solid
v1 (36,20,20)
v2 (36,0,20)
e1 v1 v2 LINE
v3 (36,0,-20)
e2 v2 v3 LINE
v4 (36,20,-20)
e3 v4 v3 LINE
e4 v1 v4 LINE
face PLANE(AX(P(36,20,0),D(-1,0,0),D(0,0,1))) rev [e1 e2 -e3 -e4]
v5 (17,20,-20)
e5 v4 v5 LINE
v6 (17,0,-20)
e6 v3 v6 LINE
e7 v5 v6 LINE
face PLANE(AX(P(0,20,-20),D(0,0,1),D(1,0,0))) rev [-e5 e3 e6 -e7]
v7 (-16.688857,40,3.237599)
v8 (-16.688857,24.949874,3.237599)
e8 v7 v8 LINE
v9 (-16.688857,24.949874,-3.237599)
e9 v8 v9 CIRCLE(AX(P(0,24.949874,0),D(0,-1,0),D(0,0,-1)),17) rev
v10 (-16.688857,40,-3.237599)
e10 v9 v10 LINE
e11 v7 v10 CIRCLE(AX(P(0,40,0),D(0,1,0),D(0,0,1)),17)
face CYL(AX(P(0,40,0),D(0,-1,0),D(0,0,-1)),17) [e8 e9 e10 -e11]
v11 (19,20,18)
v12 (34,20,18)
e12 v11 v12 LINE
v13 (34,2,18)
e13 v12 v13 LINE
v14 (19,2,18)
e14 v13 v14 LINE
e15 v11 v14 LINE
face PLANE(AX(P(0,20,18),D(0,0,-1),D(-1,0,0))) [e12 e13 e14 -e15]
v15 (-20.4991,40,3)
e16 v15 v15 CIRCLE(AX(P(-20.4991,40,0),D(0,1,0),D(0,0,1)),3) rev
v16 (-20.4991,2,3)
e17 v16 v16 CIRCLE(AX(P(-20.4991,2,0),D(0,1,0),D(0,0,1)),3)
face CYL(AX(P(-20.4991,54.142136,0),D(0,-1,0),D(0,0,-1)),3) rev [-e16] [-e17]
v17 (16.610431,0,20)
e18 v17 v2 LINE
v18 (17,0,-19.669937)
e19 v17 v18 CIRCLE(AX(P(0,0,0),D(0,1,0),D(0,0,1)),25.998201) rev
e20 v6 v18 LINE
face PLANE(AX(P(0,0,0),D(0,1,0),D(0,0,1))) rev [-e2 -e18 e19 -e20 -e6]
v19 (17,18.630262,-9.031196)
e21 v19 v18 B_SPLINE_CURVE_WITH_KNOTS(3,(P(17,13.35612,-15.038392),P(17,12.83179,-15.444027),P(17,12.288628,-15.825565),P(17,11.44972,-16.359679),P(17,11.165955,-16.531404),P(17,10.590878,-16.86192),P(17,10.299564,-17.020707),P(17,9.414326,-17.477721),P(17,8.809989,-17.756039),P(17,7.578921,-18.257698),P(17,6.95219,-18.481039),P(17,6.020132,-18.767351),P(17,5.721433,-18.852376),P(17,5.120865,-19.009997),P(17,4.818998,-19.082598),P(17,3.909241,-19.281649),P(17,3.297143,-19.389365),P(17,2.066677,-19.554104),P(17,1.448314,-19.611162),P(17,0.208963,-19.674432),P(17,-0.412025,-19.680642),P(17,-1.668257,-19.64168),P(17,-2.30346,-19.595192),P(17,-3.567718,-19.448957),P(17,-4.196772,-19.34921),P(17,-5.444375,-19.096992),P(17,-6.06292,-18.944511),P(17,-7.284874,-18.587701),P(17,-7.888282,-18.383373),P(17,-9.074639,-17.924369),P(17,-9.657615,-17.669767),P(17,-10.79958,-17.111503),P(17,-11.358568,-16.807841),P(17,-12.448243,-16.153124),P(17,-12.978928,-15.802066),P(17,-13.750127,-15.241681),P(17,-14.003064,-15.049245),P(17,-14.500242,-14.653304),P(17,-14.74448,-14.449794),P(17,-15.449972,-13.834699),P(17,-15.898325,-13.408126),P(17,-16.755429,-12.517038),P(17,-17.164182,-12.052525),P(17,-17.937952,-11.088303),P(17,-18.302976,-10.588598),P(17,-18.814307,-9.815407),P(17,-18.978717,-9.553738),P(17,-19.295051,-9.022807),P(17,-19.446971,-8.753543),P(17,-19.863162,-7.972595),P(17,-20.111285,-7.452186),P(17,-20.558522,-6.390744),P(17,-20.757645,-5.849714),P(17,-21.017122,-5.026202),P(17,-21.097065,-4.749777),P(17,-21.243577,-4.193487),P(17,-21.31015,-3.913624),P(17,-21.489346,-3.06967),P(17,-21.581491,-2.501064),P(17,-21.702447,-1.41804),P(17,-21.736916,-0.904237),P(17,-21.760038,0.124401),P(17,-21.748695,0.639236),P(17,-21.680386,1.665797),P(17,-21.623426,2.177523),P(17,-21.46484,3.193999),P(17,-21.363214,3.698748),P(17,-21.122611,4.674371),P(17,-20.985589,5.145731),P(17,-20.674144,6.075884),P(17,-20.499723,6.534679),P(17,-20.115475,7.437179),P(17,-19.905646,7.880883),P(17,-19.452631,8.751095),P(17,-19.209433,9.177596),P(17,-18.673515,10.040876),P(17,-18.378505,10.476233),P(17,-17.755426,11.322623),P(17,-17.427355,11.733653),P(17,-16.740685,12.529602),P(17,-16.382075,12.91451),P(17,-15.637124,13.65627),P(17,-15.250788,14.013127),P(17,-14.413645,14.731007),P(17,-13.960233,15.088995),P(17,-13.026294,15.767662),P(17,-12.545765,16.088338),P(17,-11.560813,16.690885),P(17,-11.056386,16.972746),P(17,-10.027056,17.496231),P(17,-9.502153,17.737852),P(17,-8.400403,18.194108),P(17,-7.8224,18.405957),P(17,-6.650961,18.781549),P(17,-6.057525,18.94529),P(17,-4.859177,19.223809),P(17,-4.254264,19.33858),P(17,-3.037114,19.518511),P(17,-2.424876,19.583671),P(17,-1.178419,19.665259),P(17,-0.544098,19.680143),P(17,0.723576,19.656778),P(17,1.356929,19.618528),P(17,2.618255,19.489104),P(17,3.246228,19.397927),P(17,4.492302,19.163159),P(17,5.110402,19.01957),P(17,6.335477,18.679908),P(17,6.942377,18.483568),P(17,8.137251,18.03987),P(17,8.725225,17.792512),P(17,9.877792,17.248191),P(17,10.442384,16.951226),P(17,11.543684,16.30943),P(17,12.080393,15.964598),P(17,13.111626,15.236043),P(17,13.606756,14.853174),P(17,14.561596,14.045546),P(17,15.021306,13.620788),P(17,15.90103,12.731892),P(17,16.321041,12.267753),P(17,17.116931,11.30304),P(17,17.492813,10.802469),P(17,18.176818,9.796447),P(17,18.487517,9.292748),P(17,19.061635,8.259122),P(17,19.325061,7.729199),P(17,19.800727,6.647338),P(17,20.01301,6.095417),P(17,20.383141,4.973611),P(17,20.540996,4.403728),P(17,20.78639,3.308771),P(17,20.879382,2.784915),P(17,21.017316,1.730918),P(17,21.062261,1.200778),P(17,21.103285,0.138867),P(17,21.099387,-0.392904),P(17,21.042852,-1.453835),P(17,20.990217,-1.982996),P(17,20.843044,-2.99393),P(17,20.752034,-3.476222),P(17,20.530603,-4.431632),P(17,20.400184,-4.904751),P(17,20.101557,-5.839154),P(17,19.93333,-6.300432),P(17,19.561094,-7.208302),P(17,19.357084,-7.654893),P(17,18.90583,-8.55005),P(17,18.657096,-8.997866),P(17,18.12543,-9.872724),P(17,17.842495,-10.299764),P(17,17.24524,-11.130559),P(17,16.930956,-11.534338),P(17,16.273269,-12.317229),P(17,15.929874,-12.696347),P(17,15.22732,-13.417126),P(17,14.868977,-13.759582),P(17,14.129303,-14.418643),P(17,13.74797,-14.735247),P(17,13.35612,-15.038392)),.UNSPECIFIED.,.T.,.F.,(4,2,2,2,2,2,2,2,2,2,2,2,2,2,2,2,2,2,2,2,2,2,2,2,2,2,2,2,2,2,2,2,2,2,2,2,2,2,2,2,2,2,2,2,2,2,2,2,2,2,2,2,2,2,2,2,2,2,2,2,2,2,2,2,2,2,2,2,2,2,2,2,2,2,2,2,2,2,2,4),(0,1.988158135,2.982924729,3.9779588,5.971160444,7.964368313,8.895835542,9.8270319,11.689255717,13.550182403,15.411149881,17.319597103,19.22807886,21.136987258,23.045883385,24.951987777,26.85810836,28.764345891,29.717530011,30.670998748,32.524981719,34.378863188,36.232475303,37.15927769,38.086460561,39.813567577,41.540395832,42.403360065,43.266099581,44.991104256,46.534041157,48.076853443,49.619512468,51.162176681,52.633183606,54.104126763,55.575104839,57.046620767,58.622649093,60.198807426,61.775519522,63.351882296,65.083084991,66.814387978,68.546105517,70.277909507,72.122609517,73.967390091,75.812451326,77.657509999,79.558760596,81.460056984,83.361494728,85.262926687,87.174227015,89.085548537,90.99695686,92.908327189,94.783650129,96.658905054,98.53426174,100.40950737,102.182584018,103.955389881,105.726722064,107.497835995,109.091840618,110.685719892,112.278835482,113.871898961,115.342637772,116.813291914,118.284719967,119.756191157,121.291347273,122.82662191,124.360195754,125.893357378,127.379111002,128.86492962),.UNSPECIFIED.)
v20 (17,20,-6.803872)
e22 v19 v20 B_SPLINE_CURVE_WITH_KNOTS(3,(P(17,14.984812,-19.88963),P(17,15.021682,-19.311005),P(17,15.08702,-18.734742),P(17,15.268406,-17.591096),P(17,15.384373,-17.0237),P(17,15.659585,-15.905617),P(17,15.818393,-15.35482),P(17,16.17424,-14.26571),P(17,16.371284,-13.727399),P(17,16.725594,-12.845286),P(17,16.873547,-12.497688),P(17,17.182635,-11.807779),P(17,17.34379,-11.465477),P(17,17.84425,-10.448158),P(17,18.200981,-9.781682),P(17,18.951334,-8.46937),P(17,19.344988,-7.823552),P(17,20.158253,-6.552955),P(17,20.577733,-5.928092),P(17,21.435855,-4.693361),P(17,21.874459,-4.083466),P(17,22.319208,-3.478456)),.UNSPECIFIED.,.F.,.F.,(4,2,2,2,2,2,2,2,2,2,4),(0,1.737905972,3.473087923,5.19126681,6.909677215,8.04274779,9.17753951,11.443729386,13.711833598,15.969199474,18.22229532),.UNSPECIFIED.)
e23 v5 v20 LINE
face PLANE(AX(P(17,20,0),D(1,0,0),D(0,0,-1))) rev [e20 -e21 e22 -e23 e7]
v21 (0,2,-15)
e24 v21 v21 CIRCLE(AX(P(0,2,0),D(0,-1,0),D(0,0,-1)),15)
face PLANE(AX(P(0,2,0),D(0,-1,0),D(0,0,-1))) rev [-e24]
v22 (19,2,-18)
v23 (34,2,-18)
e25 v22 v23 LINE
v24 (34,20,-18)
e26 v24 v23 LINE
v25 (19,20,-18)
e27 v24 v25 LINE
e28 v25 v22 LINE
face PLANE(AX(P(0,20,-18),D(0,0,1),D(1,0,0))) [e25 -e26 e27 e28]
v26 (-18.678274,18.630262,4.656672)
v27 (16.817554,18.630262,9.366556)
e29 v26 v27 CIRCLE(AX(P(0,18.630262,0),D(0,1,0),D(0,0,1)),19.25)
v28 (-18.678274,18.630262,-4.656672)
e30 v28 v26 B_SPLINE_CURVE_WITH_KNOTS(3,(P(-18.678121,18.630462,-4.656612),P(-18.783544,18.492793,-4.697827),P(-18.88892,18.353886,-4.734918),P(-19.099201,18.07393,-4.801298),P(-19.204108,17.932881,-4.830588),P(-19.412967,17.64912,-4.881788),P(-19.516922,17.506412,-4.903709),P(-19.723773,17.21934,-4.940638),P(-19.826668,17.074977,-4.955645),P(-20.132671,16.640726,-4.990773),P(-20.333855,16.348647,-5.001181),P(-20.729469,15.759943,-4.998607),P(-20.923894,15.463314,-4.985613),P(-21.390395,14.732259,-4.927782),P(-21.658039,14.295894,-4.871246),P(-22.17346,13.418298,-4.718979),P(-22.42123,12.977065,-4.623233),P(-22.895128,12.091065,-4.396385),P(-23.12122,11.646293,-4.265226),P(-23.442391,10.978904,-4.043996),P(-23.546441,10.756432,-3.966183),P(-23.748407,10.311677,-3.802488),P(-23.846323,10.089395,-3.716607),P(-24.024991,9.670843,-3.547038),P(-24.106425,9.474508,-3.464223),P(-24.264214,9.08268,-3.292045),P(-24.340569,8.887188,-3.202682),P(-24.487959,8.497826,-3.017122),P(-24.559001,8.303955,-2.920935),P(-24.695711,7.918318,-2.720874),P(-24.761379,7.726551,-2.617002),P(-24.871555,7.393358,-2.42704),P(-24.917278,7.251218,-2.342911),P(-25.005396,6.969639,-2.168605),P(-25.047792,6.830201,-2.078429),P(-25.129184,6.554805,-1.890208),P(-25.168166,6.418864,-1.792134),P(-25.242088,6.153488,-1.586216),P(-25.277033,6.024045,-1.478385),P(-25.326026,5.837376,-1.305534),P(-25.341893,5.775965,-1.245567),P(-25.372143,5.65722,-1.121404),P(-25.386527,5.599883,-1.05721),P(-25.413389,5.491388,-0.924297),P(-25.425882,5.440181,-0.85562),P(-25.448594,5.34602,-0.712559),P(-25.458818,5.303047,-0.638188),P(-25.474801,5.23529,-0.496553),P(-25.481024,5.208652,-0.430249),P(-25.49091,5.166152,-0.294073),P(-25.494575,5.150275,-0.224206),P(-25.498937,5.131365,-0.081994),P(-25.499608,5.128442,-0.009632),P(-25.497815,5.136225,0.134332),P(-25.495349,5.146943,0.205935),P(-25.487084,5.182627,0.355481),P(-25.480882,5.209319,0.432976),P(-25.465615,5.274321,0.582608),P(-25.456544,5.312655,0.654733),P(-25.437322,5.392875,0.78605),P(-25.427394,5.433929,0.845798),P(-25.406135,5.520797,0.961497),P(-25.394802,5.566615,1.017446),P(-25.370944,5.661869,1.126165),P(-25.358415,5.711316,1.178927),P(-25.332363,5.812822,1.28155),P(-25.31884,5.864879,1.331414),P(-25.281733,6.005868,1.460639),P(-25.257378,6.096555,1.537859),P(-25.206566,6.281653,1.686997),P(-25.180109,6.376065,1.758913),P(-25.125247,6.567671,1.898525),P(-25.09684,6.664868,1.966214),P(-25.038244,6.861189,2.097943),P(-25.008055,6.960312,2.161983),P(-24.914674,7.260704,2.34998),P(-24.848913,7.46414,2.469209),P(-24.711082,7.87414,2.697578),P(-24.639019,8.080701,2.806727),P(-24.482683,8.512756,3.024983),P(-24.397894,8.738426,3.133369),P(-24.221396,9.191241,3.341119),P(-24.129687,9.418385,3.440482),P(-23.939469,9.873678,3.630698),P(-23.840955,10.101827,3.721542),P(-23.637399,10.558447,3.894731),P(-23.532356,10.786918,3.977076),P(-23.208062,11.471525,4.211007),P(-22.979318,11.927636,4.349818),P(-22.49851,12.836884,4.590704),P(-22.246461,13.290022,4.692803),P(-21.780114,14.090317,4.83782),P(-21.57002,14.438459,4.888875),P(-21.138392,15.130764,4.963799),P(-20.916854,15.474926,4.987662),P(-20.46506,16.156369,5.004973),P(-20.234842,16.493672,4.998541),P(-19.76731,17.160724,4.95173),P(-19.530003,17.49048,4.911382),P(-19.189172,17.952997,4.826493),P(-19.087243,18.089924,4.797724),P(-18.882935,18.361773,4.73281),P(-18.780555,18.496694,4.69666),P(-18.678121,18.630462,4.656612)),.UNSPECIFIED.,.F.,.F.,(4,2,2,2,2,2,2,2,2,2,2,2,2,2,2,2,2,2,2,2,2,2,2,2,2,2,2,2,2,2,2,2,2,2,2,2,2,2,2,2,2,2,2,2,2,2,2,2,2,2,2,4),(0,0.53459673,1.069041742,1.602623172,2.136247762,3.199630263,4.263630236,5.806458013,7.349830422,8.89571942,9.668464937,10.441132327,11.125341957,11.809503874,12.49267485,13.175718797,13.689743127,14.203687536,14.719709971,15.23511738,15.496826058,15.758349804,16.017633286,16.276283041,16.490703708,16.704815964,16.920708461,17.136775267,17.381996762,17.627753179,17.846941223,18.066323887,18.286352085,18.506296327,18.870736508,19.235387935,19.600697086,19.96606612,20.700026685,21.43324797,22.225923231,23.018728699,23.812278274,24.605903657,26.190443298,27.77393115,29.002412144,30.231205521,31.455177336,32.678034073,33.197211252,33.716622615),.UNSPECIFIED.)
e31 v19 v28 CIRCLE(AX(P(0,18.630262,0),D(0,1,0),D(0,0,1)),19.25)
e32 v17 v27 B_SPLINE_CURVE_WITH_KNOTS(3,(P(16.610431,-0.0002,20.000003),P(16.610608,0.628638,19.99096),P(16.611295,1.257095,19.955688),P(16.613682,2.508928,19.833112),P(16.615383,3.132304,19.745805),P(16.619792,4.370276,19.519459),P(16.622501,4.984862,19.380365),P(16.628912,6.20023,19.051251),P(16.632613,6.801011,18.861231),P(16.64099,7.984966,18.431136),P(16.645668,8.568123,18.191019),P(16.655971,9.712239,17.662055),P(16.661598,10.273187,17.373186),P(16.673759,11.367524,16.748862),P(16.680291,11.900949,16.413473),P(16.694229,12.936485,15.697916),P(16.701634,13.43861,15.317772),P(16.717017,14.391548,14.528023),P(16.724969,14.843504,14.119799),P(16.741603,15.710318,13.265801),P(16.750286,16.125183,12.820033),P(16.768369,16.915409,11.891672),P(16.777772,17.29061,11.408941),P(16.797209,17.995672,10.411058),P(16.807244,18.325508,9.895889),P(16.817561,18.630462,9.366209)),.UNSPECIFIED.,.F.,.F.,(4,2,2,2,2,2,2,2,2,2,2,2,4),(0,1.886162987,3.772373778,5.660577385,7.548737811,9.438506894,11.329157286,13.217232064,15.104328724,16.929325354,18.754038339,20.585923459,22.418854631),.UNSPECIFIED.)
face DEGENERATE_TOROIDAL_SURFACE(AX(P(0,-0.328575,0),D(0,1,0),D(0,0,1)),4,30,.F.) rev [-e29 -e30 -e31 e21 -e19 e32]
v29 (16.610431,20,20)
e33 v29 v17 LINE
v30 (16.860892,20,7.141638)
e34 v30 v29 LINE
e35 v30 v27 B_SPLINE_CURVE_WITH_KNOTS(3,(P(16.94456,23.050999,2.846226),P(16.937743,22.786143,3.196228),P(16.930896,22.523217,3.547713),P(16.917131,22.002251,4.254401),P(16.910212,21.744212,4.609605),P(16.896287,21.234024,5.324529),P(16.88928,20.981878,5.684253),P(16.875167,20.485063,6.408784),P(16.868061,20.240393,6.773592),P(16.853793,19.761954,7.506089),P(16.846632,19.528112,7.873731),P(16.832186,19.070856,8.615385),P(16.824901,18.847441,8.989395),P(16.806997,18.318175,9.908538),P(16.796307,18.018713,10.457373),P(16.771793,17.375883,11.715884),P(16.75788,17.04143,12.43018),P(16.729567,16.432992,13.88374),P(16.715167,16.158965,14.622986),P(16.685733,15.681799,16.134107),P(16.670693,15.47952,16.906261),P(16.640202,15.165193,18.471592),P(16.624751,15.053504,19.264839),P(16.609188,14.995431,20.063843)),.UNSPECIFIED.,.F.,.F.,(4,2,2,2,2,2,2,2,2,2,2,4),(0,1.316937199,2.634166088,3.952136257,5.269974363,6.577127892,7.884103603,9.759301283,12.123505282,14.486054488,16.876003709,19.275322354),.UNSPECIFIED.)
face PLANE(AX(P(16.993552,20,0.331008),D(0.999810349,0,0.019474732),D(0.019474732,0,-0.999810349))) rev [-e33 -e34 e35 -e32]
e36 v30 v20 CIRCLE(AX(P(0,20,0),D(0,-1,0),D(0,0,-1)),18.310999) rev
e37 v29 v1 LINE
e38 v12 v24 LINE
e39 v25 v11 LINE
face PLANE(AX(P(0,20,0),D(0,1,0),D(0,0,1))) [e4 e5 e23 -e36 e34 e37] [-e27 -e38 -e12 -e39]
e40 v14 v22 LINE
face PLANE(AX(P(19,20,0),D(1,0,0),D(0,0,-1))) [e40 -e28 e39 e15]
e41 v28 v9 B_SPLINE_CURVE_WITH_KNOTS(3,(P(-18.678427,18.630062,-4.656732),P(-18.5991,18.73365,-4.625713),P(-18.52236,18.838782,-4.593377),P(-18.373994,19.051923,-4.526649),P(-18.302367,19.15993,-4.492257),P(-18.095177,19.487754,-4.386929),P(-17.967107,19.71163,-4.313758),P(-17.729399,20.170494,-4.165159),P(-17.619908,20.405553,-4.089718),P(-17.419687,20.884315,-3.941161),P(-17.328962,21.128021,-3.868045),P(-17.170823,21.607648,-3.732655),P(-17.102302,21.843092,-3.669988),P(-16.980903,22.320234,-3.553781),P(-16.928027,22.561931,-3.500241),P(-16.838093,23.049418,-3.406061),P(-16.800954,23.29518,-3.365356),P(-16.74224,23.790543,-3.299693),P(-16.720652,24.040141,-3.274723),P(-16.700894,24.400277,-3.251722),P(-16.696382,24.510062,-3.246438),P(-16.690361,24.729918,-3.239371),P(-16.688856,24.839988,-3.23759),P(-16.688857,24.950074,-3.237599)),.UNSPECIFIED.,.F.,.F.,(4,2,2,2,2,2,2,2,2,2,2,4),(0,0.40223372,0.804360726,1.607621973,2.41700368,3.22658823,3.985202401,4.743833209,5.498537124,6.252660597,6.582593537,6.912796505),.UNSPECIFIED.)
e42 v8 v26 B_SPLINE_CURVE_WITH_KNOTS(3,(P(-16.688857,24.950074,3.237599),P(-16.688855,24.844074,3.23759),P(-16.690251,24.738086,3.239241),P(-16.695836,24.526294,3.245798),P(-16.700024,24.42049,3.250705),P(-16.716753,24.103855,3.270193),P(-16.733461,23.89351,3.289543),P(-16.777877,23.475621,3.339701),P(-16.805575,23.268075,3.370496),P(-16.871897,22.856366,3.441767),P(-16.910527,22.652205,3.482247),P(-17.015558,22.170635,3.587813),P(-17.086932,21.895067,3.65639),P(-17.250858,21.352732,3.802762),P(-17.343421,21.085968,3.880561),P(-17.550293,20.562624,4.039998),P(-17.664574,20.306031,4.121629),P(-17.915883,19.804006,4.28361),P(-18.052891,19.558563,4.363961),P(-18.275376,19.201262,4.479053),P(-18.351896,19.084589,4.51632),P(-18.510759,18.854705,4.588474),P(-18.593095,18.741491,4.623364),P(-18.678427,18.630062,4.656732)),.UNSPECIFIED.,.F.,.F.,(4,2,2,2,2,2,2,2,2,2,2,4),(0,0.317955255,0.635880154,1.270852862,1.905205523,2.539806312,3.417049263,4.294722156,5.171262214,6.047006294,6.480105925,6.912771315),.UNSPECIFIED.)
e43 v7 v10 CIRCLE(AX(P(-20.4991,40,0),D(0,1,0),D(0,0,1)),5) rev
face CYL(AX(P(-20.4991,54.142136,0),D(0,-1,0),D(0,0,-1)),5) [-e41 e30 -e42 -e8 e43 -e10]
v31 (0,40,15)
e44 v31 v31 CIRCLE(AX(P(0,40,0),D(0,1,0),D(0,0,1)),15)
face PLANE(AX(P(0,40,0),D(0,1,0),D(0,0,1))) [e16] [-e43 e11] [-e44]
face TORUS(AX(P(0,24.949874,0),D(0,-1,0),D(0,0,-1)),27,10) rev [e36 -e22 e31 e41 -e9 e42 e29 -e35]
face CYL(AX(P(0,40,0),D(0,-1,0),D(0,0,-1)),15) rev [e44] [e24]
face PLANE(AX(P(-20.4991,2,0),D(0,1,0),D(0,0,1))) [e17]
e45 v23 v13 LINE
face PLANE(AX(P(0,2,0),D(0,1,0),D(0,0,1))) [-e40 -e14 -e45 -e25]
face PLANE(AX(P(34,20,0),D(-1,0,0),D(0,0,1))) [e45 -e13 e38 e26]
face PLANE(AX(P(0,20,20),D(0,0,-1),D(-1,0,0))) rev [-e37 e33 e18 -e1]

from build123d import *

# Parameters (mm, degrees)
SKETCH1_R               = 17
SKETCH1_R_2             = 15
BOSS_EXTRUDE1_DEPTH     = 40
SKETCH2_R               = 26
SKETCH2_R_2             = 15
BOSS_EXTRUDE2_DEPTH     = 15
FILLET1_R               = 10
BOSS_EXTRUDE4_REACH     = 56.331
SKETCH3_R               = 5
SKETCH3_R_2             = 3
CUT_EXTRUDE1_START      = -38
SKETCH4_R               = 3
CUT_EXTRUDE1_DEPTH      = 38
SKETCH5_R               = 15
BOSS_EXTRUDE5_DEPTH     = 2
BOSS_EXTRUDE10_START    = -40
SKETCH13_W              = 15
SKETCH13_H              = 36
BOSS_EXTRUDE10_DEPTH    = 20
CUT_EXTRUDE4_DEPTH      = 49.702222157
CUT_EXTRUDE4_DEPTH_BACK = 49.702222157
SKETCH14_W              = 15
SKETCH14_H              = 36
SKETCH15_W              = 15
SKETCH15_H              = 36
BOSS_EXTRUDE11_DEPTH    = 2


with BuildPart() as part:
    # Sketch1 → Boss-Extrude1 (new body)
    with BuildSketch(Plane(origin=(0, 0, 0), x_dir=(1, 0, 0), z_dir=(0, 1, 0))):
        with Locations(Location((0, 0, 0), (0, 0, 270))):
            Circle(SKETCH1_R)
        with Locations(Location((0, 0, 0), (0, 0, 270))):
            Circle(SKETCH1_R_2, mode=Mode.SUBTRACT)
    extrude(amount=BOSS_EXTRUDE1_DEPTH)

    # Sketch2 → Boss-Extrude2 (add)
    with BuildSketch(Plane.XZ):
        with Locations(Location((0, 0, 0), (0, 0, 270))):
            Circle(SKETCH2_R)
        with Locations(Location((0, 0, 0), (0, 0, 90))):
            Circle(SKETCH2_R_2, mode=Mode.SUBTRACT)
    extrude(amount=-BOSS_EXTRUDE2_DEPTH)

    # Fillet1
    # the kernel refuses this fillet: 10 mm, written as the material it adds along each edge
    with BuildSketch(Plane(origin=(0, 15, 0), x_dir=(0, 0, 1), z_dir=(1, 0, 0))) as fillet1_piece_1:
        with BuildLine():
            CenterArc((27, -9.949874371), FILLET1_R, 95.739170477, 84.260829523)
            Line((17, -9.949874371), (16.8, -9.949874371))
            Line((16.8, -9.949874371), (16.8, 0))
            Line((16.8, 0), (17, 0.2))
            ThreePointArc((17, 0.2), (21.5, 0.2), (25.98, 0.198997487))
            Line((25.98, 0.198997487), (26, 0))
        make_face()
    revolve(axis=Axis((0, 15, 0), (0, -1, 0)))

    # Fillet2: read off the stored shape, not the designer's step
    # Fillet2 outline → Fillet2 (revolve, cut)
    with BuildSketch(Plane.XY):
        with BuildLine():
            Line((25.998200588, 18.630262041), (19.25, 18.630262041))
            ThreePointArc((19.25, 18.630262041), (24.206637205, 9.888353044), (25.998200588, 0))
            Line((25.998200588, 0), (25.998200588, 18.630262041))
        make_face()
    revolve(axis=Axis((0, 0, 0), (0, 1, 0)), mode=Mode.SUBTRACT)

    # Fillet2 2 outline → Fillet2 2 (revolve, cut)
    with BuildSketch(Plane.XY):
        with BuildLine():
            Line((26, 0), (26, 15))
            ThreePointArc((26, 15), (25.999100287, 15.000090466), (25.998200582, 15.000181013))
            Line((25.998200582, 15.000181013), (25.998200588, 0))
            Line((25.998200588, 0), (26, 0))
        make_face()
    revolve(axis=Axis((0, 0, 0), (0, 1, 0)), mode=Mode.SUBTRACT)

    # Boss-Extrude4: up to this face of the body (flat: up to its plane)
    boss_extrude4_end = Plane(part.part.faces().sort_by_distance((0, 40, -16.519167389))[0])
    # Sketch3 → Boss-Extrude4 (add, up to the picked face)
    with BuildSketch(Plane.XZ, mode=Mode.PRIVATE) as boss_extrude4_sk1:
        with Locations((-20.499100294, 0)):
            Circle(SKETCH3_R)
        with Locations(Location((-20.499100294, 0, 0), (0, 0, 298.480209609))):
            Circle(SKETCH3_R_2, mode=Mode.SUBTRACT)
    boss_extrude4_tool1 = split(extrude(boss_extrude4_sk1.sketch, amount=-BOSS_EXTRUDE4_REACH, mode=Mode.PRIVATE), bisect_by=boss_extrude4_end, keep=Keep.BOTH, mode=Mode.PRIVATE)
    add(boss_extrude4_tool1.solids().sort_by(Axis((-25.357679, 0, 0), (0, 1, 0)))[0])

    # Sketch4 → Cut-Extrude1 (cut)
    with BuildSketch(Plane(origin=(0, 40, 0), x_dir=(1, 0, 0), z_dir=(0, 1, 0)).offset(CUT_EXTRUDE1_START)):
        with Locations(Location((-20.499100294, 0, 0), (0, 0, 270))):
            Circle(SKETCH4_R)
    extrude(amount=CUT_EXTRUDE1_DEPTH, mode=Mode.SUBTRACT)

    # Sketch5 → Boss-Extrude5 (add)
    with BuildSketch(Plane.XZ):
        with Locations(Location((0, 0, 0), (0, 0, 270))):
            Circle(SKETCH5_R)
    extrude(amount=-BOSS_EXTRUDE5_DEPTH)

    # Sketch13 → Boss-Extrude10 (add)
    with BuildSketch(Plane(origin=(0, 40, 0), x_dir=(1, 0, 0), z_dir=(0, 1, 0)).offset(BOSS_EXTRUDE10_START)):
        Polygon((17, 0), (17, 20), (36, 20), (36, -20), (16.610431475, -20), align=None)
        with Locations((26.5, 0)):
            Rectangle(SKETCH13_W, SKETCH13_H, mode=Mode.SUBTRACT)
    extrude(amount=BOSS_EXTRUDE10_DEPTH)

    # Sketch14 → Cut-Extrude4 (cut, two sides: drawn at the far end of the back side and taken through both)
    with BuildSketch(Plane(origin=(0, 20, 0), x_dir=(1, 0, 0), z_dir=(0, 1, 0)).offset(-CUT_EXTRUDE4_DEPTH_BACK)):
        with Locations((26.5, 0)):
            Rectangle(SKETCH14_W, SKETCH14_H)
    extrude(amount=CUT_EXTRUDE4_DEPTH + CUT_EXTRUDE4_DEPTH_BACK, mode=Mode.SUBTRACT)

    # Sketch15 → Boss-Extrude11 (add)
    with BuildSketch(Plane.XZ):
        with Locations((26.5, 0)):
            Rectangle(SKETCH15_W, SKETCH15_H)
    extrude(amount=-BOSS_EXTRUDE11_DEPTH)


solid = part.part
